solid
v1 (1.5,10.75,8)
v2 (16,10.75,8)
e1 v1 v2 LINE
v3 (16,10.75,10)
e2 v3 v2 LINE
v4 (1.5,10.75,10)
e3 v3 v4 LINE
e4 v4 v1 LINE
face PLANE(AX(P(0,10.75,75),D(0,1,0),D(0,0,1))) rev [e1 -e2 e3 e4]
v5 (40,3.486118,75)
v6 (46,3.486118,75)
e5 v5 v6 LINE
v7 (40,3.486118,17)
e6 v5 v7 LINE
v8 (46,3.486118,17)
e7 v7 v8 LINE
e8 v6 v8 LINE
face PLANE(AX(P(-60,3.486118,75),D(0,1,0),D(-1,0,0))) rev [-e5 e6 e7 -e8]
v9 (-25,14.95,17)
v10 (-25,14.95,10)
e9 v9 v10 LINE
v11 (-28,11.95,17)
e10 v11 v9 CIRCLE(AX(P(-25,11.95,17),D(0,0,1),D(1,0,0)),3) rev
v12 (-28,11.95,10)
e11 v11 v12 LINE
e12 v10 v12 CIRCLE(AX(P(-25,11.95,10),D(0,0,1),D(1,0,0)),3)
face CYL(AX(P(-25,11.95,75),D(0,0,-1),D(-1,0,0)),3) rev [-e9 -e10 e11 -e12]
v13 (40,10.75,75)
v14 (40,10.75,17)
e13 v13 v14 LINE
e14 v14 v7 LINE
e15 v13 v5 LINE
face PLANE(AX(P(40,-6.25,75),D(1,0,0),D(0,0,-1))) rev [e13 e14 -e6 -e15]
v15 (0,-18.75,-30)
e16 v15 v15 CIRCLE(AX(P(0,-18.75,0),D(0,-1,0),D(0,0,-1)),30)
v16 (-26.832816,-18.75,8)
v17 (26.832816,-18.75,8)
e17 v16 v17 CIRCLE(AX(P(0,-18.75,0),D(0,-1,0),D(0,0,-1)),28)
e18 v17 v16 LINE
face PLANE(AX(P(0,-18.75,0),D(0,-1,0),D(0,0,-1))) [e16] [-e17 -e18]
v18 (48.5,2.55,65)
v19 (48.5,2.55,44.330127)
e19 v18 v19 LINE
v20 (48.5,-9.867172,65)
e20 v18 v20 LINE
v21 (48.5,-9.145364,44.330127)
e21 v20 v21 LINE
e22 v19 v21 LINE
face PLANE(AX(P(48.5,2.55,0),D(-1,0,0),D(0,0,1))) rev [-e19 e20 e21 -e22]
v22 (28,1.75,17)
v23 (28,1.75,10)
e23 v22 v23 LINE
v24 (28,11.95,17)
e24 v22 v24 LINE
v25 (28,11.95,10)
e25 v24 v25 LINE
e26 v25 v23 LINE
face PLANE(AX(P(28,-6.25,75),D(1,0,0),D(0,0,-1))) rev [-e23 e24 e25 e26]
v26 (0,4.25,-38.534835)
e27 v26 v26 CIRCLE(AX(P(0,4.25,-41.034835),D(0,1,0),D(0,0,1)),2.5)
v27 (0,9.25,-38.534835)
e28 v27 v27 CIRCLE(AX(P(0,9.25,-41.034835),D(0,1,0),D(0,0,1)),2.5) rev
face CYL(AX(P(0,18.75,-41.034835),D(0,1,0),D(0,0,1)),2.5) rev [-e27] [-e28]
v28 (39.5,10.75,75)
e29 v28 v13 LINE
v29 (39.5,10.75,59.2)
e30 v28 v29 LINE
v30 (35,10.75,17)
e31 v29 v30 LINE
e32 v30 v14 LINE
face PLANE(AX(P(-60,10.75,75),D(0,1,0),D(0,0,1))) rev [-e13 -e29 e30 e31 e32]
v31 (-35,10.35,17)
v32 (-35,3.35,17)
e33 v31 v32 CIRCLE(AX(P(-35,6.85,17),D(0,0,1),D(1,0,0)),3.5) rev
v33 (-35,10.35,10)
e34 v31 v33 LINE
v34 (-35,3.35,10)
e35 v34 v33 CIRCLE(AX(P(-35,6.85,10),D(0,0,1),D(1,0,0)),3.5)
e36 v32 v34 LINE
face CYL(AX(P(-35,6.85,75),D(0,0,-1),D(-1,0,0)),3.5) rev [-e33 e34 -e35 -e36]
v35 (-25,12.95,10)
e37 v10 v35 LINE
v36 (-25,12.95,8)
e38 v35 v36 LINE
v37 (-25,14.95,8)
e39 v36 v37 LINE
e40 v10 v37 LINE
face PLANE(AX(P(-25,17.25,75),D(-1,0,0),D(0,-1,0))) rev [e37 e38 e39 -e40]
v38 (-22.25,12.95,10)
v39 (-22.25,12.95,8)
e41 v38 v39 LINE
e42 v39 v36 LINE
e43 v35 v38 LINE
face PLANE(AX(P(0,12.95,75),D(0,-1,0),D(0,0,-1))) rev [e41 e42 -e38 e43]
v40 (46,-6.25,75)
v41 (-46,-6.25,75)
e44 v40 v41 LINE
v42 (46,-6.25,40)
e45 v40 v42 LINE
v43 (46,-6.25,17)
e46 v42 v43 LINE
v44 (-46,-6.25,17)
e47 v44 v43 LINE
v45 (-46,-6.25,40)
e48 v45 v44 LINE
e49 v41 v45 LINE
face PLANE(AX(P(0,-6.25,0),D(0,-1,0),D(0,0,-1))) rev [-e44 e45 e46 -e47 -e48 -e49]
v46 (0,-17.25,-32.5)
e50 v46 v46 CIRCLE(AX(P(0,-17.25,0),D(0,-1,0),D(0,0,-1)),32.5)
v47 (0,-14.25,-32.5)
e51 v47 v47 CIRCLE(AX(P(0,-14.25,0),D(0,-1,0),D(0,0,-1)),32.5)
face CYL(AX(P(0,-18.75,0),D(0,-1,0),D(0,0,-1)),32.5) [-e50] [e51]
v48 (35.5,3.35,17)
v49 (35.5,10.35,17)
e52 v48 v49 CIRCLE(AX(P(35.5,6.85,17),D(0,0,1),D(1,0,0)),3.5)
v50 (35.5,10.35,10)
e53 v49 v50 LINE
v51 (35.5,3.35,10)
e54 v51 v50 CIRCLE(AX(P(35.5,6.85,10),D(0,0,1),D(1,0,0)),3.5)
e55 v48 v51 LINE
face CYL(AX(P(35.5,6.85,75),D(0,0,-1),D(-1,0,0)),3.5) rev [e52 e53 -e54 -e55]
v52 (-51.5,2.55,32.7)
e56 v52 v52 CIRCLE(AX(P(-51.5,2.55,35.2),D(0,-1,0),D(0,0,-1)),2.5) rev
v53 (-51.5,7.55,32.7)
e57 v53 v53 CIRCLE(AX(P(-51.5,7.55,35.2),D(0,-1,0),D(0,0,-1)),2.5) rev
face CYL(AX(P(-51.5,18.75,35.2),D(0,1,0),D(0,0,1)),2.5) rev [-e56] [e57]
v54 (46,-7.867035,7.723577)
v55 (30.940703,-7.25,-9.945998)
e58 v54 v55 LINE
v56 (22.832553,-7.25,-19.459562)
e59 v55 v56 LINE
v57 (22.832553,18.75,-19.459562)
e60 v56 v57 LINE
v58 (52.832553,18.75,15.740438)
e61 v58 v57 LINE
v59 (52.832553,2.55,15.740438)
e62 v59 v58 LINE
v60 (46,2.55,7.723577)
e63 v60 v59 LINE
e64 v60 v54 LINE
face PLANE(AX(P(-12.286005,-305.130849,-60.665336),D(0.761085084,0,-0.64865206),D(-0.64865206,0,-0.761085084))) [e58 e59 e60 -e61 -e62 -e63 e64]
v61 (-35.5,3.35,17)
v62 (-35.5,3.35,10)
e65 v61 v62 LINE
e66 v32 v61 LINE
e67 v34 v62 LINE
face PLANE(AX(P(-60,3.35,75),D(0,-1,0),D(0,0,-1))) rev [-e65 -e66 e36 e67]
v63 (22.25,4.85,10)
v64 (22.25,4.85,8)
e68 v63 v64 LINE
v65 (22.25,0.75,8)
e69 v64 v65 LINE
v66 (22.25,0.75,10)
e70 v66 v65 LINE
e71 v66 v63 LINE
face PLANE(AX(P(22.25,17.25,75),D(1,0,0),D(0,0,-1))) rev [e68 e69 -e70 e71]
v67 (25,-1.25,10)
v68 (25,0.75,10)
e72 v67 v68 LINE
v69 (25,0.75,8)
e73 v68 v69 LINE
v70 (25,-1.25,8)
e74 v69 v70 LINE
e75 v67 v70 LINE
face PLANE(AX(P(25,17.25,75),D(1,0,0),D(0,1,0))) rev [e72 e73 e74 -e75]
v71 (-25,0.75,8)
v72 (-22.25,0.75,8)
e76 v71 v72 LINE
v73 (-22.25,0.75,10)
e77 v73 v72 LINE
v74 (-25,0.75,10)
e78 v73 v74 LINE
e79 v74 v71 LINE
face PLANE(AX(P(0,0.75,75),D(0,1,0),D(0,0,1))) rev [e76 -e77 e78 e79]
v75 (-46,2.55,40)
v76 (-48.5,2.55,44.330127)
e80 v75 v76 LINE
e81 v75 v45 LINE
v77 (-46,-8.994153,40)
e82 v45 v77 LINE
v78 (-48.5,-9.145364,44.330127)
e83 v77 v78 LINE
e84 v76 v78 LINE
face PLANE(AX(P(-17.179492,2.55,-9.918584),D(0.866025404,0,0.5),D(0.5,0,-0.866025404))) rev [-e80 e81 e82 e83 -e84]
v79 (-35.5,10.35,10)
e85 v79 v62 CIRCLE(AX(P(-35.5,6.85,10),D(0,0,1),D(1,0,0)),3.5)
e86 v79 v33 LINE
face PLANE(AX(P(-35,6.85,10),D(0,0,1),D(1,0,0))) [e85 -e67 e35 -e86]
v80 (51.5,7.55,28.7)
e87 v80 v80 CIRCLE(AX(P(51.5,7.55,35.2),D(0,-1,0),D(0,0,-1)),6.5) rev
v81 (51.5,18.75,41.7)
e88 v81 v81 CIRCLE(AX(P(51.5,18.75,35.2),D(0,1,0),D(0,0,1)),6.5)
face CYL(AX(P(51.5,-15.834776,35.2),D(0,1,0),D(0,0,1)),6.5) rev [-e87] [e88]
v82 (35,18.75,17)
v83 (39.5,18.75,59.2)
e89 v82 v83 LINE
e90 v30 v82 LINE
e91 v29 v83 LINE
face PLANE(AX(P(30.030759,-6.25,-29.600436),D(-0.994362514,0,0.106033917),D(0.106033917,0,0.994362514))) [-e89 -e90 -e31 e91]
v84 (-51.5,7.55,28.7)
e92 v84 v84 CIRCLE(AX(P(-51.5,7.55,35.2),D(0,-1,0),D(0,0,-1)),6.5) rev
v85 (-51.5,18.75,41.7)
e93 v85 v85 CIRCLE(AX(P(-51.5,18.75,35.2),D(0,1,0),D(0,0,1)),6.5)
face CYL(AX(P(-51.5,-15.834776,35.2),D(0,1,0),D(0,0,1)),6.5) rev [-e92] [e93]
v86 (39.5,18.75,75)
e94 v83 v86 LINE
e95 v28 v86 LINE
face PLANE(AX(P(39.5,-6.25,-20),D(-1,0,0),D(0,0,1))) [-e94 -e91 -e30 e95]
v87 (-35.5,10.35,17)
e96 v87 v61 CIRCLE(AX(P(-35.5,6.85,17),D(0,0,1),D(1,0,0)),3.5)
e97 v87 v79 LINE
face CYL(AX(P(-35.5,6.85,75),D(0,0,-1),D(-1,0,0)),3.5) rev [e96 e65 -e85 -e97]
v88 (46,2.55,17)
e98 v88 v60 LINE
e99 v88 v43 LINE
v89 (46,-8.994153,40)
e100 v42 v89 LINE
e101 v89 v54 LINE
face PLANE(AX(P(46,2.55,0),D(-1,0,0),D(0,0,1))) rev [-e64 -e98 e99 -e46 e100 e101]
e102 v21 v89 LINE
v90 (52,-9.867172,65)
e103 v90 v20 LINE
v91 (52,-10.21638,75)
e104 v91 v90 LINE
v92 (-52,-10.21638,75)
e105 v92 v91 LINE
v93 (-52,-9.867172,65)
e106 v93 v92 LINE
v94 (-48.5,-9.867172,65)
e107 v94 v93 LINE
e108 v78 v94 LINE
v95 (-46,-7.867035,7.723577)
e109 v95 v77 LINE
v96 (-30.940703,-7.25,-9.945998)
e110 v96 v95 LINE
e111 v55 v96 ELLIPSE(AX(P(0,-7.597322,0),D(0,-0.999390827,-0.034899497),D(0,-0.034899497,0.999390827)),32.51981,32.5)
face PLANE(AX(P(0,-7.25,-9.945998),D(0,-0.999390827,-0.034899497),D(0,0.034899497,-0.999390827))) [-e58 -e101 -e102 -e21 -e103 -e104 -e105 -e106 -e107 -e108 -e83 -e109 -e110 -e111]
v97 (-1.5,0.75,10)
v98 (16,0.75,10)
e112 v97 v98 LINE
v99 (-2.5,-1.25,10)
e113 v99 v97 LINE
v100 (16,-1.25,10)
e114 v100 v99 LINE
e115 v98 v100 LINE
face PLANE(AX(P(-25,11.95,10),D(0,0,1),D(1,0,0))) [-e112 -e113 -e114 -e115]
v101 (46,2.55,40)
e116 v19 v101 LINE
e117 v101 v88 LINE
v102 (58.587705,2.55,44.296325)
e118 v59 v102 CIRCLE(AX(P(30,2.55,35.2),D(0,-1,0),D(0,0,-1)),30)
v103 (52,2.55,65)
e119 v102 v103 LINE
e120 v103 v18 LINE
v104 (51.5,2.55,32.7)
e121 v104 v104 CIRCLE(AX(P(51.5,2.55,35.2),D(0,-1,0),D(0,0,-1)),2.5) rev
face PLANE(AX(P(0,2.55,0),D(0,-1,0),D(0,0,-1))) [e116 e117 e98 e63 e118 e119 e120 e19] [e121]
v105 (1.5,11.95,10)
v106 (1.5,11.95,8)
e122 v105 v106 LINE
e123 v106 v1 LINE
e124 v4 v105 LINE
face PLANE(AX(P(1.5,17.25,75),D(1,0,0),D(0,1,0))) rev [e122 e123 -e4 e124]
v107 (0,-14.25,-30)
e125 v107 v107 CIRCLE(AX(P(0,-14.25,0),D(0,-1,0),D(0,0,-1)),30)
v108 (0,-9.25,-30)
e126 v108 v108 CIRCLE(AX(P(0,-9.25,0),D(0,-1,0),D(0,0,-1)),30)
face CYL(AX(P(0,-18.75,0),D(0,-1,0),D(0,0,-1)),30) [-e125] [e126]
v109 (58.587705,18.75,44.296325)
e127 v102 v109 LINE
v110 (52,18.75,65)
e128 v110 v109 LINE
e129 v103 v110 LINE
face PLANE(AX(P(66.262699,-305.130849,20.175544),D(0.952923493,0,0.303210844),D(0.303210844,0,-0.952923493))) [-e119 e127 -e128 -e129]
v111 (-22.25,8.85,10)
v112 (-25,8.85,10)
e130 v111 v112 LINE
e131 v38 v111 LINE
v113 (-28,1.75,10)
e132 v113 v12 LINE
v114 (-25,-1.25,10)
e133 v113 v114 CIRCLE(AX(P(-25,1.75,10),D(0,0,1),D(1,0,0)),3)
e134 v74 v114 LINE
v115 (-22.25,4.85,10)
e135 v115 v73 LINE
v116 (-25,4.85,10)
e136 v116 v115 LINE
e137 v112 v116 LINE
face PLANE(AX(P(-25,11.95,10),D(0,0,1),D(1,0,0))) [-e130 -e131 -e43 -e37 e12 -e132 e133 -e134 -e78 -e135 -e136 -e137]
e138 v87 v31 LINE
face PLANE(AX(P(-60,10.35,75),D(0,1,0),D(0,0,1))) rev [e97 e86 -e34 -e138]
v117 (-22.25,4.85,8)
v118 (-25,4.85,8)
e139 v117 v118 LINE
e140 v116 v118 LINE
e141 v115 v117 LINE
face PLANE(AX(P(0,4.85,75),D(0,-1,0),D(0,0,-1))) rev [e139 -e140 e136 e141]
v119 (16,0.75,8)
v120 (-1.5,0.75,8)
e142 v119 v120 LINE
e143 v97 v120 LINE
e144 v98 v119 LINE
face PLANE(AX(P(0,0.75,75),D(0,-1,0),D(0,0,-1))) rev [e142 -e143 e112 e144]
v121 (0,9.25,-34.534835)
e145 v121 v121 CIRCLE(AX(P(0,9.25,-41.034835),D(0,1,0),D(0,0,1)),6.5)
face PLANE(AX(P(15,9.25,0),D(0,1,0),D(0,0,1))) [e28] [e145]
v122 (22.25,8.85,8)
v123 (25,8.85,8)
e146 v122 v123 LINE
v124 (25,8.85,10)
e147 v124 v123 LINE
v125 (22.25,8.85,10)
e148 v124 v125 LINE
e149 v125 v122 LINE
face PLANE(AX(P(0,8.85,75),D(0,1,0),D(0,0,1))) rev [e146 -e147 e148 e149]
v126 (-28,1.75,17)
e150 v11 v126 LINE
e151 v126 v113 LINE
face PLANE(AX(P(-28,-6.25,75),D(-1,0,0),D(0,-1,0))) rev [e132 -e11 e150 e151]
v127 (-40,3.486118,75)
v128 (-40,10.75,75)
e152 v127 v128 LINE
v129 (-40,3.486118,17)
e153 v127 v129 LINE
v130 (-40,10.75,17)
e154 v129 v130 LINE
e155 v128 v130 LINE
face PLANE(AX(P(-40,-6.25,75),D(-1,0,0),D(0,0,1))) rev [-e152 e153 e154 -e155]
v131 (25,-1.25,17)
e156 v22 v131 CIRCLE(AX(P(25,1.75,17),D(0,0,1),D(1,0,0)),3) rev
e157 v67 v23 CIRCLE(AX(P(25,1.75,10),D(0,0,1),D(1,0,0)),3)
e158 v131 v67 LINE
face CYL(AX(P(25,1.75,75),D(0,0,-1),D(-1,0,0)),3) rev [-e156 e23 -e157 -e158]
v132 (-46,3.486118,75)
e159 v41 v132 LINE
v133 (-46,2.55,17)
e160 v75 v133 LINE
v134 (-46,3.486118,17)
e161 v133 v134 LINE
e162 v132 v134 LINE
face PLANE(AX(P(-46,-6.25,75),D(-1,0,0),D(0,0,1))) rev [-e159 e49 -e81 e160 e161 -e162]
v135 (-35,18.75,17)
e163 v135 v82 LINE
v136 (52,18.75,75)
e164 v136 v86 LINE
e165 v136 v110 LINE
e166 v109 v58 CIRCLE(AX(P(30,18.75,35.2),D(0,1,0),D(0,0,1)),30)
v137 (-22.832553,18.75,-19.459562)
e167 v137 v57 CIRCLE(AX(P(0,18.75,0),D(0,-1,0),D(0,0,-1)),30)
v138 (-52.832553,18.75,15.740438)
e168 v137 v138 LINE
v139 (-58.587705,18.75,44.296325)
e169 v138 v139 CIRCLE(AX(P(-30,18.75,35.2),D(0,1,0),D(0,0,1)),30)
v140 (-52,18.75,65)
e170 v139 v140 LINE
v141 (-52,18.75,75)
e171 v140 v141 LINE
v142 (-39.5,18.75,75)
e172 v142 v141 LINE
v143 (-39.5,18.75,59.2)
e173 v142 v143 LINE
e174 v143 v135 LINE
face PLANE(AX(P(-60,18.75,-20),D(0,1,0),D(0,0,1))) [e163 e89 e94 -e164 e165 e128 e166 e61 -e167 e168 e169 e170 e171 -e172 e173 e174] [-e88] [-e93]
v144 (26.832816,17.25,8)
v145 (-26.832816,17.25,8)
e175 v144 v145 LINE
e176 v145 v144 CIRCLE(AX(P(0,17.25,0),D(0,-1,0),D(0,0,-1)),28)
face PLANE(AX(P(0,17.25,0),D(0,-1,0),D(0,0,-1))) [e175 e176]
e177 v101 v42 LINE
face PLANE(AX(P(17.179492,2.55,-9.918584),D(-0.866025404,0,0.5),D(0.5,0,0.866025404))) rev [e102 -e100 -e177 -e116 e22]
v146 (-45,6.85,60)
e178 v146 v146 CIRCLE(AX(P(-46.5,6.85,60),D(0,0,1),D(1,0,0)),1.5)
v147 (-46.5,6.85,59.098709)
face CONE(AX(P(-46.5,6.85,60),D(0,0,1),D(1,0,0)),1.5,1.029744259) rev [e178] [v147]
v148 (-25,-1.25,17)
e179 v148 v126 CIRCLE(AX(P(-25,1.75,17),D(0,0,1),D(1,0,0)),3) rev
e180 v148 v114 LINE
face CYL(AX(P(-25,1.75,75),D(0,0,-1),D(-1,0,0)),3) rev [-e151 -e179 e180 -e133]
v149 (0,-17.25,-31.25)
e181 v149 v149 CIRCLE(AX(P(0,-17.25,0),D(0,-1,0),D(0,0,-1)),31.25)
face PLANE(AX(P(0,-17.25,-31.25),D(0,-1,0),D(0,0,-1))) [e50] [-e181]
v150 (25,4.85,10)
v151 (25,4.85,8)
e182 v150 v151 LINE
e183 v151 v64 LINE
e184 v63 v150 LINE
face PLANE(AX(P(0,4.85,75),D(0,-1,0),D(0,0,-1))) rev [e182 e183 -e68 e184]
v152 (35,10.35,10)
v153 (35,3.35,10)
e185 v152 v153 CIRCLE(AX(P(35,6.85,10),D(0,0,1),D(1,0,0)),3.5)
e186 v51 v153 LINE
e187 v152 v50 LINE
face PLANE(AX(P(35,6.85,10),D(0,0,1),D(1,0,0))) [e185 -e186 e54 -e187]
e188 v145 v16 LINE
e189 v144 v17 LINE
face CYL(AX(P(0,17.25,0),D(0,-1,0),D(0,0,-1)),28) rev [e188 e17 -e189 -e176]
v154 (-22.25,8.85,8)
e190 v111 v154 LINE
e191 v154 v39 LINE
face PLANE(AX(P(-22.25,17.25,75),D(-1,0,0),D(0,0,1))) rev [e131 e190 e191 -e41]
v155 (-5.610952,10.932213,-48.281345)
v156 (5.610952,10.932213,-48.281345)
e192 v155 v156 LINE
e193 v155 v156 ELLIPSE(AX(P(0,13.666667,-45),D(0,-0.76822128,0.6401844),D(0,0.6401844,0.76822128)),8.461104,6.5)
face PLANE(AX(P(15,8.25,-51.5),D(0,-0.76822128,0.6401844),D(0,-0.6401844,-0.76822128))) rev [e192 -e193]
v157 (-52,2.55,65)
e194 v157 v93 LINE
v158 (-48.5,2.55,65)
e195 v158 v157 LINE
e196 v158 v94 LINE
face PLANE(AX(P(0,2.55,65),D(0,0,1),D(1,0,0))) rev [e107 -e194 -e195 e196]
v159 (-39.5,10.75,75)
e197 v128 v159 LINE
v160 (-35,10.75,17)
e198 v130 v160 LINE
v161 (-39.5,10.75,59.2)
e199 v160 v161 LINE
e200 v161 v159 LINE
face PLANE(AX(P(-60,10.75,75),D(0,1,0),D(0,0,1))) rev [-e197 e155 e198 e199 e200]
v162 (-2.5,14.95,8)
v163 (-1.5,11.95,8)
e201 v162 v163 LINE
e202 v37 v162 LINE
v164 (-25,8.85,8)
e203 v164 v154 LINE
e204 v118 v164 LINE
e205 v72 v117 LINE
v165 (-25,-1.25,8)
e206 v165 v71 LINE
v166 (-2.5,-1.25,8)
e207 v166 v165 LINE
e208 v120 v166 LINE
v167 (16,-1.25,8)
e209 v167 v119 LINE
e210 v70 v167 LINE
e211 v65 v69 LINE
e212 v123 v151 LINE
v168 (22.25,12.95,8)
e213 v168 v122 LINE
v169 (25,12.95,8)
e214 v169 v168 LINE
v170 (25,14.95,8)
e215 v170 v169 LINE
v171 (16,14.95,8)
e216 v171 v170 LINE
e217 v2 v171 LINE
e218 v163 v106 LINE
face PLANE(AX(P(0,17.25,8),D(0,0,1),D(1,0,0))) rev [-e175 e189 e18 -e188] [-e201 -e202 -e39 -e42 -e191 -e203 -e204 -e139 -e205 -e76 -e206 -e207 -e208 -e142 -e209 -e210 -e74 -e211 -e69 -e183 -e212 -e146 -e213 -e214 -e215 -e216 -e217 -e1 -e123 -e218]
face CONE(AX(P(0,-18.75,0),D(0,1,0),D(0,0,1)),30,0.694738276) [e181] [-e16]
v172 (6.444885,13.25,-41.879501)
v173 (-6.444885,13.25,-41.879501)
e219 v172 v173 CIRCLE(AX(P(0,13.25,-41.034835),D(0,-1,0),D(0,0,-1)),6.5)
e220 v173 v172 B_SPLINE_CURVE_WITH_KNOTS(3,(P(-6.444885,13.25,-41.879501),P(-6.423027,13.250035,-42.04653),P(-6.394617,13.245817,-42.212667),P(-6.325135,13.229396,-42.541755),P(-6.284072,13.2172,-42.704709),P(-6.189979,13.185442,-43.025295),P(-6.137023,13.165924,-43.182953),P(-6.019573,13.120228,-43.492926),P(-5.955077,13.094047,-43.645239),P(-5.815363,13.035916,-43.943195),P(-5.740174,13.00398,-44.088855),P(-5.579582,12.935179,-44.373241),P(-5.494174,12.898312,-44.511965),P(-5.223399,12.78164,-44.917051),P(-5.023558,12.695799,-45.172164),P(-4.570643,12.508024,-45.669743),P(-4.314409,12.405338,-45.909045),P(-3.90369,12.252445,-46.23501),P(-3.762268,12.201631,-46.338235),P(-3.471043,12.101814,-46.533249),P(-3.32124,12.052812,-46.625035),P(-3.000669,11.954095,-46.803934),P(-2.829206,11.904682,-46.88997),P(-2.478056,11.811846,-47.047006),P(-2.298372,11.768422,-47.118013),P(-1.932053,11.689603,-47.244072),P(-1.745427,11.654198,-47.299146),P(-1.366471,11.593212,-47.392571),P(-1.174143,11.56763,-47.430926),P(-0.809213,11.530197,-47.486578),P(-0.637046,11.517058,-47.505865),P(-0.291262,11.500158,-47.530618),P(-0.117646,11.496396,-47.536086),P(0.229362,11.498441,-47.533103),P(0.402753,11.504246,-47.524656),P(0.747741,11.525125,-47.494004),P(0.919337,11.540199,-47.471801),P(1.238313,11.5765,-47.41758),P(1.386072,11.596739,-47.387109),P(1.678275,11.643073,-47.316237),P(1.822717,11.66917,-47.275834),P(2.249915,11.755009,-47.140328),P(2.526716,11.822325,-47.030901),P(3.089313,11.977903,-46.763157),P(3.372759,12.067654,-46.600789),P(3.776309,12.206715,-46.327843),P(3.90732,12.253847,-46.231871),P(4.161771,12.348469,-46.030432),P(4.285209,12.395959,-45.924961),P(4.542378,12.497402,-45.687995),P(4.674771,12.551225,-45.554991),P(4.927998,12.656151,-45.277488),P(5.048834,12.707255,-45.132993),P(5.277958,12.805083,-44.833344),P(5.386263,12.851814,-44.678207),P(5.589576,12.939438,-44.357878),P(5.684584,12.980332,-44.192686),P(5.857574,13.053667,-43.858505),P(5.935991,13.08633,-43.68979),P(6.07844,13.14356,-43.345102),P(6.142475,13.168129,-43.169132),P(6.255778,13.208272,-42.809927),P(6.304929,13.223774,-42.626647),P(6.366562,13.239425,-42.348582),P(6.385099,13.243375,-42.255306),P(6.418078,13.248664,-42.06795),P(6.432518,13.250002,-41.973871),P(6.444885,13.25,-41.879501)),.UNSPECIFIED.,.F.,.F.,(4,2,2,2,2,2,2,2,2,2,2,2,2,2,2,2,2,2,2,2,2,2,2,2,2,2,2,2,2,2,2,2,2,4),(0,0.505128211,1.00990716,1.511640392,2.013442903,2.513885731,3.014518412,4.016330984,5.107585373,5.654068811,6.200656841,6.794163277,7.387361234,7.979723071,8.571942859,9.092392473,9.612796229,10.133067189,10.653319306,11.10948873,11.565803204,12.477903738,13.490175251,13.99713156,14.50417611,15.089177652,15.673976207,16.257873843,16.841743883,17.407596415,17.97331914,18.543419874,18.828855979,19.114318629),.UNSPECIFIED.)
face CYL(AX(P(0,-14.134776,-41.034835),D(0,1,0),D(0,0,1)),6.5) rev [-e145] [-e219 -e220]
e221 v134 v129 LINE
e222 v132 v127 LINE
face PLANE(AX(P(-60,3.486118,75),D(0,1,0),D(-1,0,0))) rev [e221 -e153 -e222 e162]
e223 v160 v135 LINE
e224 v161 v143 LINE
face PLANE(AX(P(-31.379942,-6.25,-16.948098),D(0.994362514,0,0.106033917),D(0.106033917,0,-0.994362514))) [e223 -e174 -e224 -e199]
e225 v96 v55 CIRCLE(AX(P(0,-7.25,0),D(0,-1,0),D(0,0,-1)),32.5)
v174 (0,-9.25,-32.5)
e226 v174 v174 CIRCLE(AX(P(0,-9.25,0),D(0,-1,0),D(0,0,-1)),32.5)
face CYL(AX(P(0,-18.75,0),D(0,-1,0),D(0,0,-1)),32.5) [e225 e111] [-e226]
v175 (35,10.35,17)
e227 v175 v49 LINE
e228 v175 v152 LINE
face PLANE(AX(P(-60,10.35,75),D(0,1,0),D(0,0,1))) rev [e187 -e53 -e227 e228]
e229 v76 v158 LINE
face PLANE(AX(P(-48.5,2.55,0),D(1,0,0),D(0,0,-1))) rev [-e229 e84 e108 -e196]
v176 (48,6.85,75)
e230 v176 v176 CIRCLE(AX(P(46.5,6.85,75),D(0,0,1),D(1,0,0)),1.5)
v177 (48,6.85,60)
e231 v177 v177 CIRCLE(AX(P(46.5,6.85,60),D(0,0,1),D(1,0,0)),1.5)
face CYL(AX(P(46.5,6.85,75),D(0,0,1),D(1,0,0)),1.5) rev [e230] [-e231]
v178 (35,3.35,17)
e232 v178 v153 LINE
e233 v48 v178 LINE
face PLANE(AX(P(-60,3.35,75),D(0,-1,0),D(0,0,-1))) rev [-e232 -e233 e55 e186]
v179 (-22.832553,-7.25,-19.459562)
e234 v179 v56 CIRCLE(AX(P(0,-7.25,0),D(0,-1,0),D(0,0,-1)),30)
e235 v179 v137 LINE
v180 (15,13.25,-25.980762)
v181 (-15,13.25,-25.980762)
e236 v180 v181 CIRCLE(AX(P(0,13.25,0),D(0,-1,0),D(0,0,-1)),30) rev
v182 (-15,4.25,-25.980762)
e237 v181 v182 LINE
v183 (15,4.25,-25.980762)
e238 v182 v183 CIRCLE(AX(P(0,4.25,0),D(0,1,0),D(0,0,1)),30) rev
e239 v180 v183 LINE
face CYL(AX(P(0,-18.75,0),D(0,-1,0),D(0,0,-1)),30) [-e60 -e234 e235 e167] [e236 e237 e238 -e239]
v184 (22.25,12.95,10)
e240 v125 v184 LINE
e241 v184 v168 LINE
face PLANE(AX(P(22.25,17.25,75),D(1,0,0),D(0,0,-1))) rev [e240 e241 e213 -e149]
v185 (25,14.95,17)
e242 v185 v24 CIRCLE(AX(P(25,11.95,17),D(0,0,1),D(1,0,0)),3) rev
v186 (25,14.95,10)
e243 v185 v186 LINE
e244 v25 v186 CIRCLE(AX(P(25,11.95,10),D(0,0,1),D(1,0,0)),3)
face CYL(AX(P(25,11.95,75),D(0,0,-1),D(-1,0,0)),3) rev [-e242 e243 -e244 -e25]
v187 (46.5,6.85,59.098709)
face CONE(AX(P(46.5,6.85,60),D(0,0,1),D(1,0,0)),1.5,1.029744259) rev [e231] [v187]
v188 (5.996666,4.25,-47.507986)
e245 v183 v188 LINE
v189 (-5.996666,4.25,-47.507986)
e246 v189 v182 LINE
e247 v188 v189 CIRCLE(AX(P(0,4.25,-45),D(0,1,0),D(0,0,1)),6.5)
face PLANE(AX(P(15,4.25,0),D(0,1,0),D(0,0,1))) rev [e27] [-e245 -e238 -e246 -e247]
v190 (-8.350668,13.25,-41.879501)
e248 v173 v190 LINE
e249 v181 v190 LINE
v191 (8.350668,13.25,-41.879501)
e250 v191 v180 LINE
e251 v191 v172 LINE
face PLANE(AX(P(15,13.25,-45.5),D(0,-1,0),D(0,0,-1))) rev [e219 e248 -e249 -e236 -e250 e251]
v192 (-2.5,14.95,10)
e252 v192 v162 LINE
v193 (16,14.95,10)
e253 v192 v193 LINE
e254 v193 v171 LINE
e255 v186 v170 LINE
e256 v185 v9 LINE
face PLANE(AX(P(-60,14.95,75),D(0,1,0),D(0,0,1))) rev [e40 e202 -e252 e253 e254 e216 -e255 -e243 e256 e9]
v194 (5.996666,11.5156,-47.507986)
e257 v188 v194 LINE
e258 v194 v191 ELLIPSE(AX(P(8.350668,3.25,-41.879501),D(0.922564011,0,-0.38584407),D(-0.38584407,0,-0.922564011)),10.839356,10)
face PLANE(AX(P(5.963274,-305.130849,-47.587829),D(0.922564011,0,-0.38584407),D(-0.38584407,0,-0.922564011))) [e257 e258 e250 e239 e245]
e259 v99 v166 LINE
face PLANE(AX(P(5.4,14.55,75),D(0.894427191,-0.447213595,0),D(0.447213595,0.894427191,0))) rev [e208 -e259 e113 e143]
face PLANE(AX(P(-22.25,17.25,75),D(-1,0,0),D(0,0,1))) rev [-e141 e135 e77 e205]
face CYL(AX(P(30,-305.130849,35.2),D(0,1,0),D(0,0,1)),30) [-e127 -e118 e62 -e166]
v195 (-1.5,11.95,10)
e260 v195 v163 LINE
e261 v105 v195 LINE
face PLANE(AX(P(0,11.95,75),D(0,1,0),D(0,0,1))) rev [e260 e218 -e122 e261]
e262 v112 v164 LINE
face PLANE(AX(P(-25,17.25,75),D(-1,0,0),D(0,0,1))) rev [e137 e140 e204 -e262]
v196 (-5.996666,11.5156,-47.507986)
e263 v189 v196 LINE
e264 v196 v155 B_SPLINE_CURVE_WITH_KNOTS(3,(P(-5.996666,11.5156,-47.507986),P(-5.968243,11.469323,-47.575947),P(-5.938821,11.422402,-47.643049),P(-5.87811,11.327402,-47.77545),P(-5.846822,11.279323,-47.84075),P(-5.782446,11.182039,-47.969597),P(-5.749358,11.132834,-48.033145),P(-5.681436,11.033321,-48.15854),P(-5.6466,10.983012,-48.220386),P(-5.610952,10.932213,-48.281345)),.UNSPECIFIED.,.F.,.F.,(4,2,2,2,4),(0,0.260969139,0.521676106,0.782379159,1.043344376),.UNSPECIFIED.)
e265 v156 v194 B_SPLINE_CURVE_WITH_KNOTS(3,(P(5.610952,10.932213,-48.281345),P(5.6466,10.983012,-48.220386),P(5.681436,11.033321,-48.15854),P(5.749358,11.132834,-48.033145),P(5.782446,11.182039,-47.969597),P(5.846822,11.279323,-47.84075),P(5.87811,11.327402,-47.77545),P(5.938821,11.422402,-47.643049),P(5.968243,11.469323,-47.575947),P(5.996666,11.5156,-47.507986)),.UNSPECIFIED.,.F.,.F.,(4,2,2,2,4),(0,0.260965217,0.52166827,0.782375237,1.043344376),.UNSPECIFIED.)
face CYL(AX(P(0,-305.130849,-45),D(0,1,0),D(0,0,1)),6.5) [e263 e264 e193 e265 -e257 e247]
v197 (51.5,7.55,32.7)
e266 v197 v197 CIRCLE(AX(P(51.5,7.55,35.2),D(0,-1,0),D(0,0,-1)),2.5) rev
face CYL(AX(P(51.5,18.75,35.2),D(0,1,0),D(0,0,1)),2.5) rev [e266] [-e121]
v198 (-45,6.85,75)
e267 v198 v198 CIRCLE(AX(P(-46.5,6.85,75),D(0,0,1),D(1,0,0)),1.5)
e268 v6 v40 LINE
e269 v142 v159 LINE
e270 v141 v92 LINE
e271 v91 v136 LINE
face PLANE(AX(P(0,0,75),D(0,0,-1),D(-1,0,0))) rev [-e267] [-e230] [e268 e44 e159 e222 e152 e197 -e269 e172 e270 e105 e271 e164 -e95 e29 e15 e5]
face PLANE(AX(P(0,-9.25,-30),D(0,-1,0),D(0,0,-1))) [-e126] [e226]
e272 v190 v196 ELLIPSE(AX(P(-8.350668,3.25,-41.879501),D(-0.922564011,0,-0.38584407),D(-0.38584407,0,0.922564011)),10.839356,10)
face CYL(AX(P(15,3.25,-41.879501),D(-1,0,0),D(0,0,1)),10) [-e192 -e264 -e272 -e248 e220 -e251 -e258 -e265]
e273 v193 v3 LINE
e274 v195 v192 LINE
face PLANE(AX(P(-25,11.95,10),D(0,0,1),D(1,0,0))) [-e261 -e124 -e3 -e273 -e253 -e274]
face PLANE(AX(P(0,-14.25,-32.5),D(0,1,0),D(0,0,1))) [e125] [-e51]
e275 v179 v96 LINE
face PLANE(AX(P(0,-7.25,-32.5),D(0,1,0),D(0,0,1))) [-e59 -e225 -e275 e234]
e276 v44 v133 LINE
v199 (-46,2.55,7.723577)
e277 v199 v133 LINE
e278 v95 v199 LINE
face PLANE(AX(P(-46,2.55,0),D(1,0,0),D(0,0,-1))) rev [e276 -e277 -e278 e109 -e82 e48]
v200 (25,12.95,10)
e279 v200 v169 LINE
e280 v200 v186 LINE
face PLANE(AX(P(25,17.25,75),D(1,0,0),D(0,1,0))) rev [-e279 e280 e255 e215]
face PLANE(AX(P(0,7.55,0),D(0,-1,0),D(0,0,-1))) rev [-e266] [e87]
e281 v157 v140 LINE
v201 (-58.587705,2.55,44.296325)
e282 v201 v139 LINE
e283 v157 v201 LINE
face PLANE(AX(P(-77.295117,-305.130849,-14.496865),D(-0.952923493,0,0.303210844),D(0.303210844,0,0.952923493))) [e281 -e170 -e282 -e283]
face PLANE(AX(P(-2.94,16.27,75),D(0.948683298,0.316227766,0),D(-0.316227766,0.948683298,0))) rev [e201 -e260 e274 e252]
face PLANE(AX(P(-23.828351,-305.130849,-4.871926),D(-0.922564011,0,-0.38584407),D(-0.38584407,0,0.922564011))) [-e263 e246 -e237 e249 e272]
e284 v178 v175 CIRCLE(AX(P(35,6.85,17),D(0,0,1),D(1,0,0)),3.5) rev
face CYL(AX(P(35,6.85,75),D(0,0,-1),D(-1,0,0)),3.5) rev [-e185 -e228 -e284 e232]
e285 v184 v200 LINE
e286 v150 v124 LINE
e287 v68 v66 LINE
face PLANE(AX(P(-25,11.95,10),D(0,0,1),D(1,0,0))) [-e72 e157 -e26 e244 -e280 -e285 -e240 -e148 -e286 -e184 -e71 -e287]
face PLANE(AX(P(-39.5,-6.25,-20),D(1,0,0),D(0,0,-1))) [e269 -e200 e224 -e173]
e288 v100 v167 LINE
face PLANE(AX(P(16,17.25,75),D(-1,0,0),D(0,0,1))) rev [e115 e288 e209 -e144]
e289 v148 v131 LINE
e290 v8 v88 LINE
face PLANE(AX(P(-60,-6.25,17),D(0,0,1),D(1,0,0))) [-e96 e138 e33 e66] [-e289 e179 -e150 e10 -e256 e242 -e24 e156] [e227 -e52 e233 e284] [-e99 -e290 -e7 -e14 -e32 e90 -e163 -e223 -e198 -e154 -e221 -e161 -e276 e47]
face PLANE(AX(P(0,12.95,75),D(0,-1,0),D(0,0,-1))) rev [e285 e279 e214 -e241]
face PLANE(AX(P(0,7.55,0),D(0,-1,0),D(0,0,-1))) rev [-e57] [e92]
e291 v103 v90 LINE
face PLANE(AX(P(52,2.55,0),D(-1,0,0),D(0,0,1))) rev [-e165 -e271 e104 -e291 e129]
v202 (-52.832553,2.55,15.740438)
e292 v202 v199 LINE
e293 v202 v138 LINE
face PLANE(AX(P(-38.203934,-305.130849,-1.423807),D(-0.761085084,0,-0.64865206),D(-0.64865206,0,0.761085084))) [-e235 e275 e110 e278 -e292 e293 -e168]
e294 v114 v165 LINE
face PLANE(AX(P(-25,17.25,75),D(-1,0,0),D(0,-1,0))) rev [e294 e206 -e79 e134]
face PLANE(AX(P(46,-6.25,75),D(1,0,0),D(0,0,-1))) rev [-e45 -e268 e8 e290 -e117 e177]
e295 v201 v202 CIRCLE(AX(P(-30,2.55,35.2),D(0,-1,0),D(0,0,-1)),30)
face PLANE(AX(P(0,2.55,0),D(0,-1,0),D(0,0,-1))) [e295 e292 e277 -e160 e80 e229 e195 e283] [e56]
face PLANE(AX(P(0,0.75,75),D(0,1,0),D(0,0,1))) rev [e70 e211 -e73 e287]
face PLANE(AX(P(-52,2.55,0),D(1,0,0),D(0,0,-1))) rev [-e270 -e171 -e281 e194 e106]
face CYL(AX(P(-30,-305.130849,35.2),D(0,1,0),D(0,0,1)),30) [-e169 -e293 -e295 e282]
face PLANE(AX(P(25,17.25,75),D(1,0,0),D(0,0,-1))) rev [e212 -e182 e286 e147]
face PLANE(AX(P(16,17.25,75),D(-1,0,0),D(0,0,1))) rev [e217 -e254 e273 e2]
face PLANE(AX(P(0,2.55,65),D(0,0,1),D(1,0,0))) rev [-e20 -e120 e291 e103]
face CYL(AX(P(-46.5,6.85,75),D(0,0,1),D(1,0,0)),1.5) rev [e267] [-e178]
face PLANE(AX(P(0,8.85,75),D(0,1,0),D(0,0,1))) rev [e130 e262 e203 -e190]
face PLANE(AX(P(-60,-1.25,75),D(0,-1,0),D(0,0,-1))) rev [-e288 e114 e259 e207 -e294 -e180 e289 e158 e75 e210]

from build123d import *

# Parameters (mm, degrees)
TOP_SIDE_R                   = 0.5
BASE_MODEL_DEPTH             = 0.5
BOSS_EXTRUDE1_DEPTH          = 15
BOSS_EXTRUDE2_DEPTH          = 75
BOSS_EXTRUDE2_DEPTH_BACK     = 20
SKETCH9_W                    = 120
SKETCH9_H                    = 26
F_5_0_5_DIAMETER_HOLE1_D     = 5
CUT_EXTRUDE1_START           = 2.55
CUT_EXTRUDE1_DEPTH           = 21.3
CUT_EXTRUDE2_DEPTH           = 98.85991263
CUT_EXTRUDE2_DEPTH_BACK      = 9.8
CUT_EXTRUDE2_START           = 2.55
DRAFT11_START                = -48.5
DRAFT11_DEPTH                = 97
DRAFT11_START_2              = -52
DRAFT11_2_DEPTH              = 104
DRAFT11_START_3              = -9.867171929
DRAFT11_3_DEPTH              = 2.617171929
CUT_EXTRUDE5_START           = -18.75
CUT_EXTRUDE5_DEPTH           = 36
FILLET2_R                    = 10
CUT_EXTRUDE3_START           = 13.25
SKETCH12_R                   = 6.5
CUT_EXTRUDE3_DEPTH           = 4
CUT_EXTRUDE4_START           = 7.55
SKETCH14_R                   = 6.5
CUT_EXTRUDE4_DEPTH           = 11.2
CUT_EXTRUDE6_START           = -6.25
CUT_EXTRUDE6_DEPTH           = 25
CUT_EXTRUDE7_DEPTH           = 98.85991263
CUT_EXTRUDE7_DEPTH_BACK      = 7
CUT_EXTRUDE7_START           = 17
CUT_EXTRUDE8_START           = 17
CUT_EXTRUDE8_DEPTH           = 81.85991263
CUT_EXTRUDE9_START           = 8
CUT_EXTRUDE9_DEPTH           = 90.85991263
F_3_0_3_DIAMETER_HOLE1_D     = 3
F_3_0_3_DIAMETER_HOLE1_DEPTH = 15
F_3_0_3_DIAMETER_HOLE1_TIP   = 0.901290929


with BuildPart() as part:
    # Top Side → Base Model (new, symmetric)
    with BuildSketch(Plane(origin=(0, 0, 0), x_dir=(1, 0, 0), z_dir=(0, 1, 0))):
        with Locations(Location((0, 0, 0), (0, 0, 270))):
            Circle(TOP_SIDE_R)
    extrude(amount=BASE_MODEL_DEPTH, both=True)



with BuildPart() as body_2:
    # Sketch3 → Base (revolve)
    with BuildSketch(Plane(origin=(0, 0, 0), x_dir=(0, 0, -1), z_dir=(1, 0, 0))):
        Polygon((0, -18.75), (30, -18.75), (31.25, -17.25), (32.5, -17.25), (32.5, -14.25), (30, -14.25), (30, -9.25), (32.5, -9.25), (32.5, -7.25), (30, -7.25), (30, 18.75), (0, 18.75), align=None)
    revolve(axis=Axis((0, -18.75, 0), (0, 1, 0)))

    # Sketch8 → Boss-Extrude1 (add, symmetric)
    with BuildSketch(Plane(origin=(0, 0, 0), x_dir=(0, 0, -1), z_dir=(1, 0, 0))):
        Polygon((0, 4.25), (51.5, 4.25), (51.5, 8.25), (45.5, 13.25), (0, 13.25), align=None)
    extrude(amount=BOSS_EXTRUDE1_DEPTH, both=True)


with BuildPart() as part_1:
    add(part.part)

    add(body_2.part)  # Boss-Extrude2 merges body 2
    # Sketch9 → Boss-Extrude2 (add, two sides: drawn at the far end of the back side and taken through both)
    with BuildSketch(Plane.XY.offset(-BOSS_EXTRUDE2_DEPTH_BACK)):
        with Locations((0, 5.75)):
            Rectangle(SKETCH9_W, SKETCH9_H)
    extrude(amount=BOSS_EXTRUDE2_DEPTH + BOSS_EXTRUDE2_DEPTH_BACK)

    # Ø5.0 (5) Diameter Hole1 (through all)
    with Locations(Plane(origin=(0, 18.75, 0), x_dir=(1, 0, 0), z_dir=(0, 1, 0))):
        with Locations((-51.5, -35.2), (0, 41.034834557), (51.5, -35.2)):
            Hole(F_5_0_5_DIAMETER_HOLE1_D / 2)

    # Bottom Side Sketch5 → Cut-Extrude1 (cut)
    with BuildSketch(Plane(origin=(0, 0, 0), x_dir=(1, 0, 0), z_dir=(0, 1, 0)).offset(CUT_EXTRUDE1_START)):
        with BuildLine():
            Line((-25.617376915, 20), (-46, -6.107466904))
            Line((-46, -6.107466904), (-46, -40))
            Line((-46, -40), (-48.5, -44.330127019))
            Line((-48.5, -44.330127019), (-48.5, -65))
            Line((-48.5, -65), (-52, -65))
            Line((-52, -65), (-52, -116.5))
            Line((-52, -116.5), (-101.5, -116.5))
            Line((-101.5, -116.5), (-101.5, 101.5))
            Line((-101.5, 101.5), (101.5, 101.5))
            Line((101.5, 101.5), (101.5, -116.5))
            Line((101.5, -116.5), (52, -116.5))
            Line((52, -116.5), (52, -65))
            Line((52, -65), (48.5, -65))
            Line((48.5, -65), (48.5, -44.330127019))
            Line((48.5, -44.330127019), (46, -40))
            Line((46, -40), (46, -6.107466904))
            Line((46, -6.107466904), (25.617376915, 20))
            ThreePointArc((25.617376915, 20), (0, 32.5), (-25.617376915, 20))
        make_face()
    extrude(amount=-CUT_EXTRUDE1_DEPTH, mode=Mode.SUBTRACT)

    # Sketch11 → Cut-Extrude2 (cut, two sides: drawn at the far end of the back side and taken through both)
    with BuildSketch(Plane(origin=(0, 0, 0), x_dir=(1, 0, 0), z_dir=(0, 1, 0)).offset(CUT_EXTRUDE2_START - CUT_EXTRUDE2_DEPTH_BACK)):
        with BuildLine():
            Line((-52, -116.5), (-52, -65))
            Line((-52, -65), (-58.587704801, -44.296325315))
            ThreePointArc((-58.587704801, -44.296325315), (-59.408678786, -29.272976119), (-52.832552516, -15.740438196))
            Line((-52.832552516, -15.740438196), (-22.832552516, 19.459561804))
            ThreePointArc((-22.832552516, 19.459561804), (-19.195234326, 23.055215877), (-15, 25.980762114))
            Line((-15, 25.980762114), (-5.996666068, 47.507986456))
            ThreePointArc((-5.996666068, 47.507986456), (0, 51.5), (5.996666068, 47.507986456))
            Line((5.996666068, 47.507986456), (15, 25.980762114))
            ThreePointArc((15, 25.980762114), (19.195234326, 23.055215877), (22.832552516, 19.459561804))
            Line((22.832552516, 19.459561804), (52.832552516, -15.740438196))
            ThreePointArc((52.832552516, -15.740438196), (59.408678786, -29.272976119), (58.587704801, -44.296325315))
            Line((58.587704801, -44.296325315), (52, -65))
            Line((52, -65), (52, -116.5))
            Line((52, -116.5), (101.5, -116.5))
            Line((101.5, -116.5), (101.5, 101.5))
            Line((101.5, 101.5), (-101.5, 101.5))
            Line((-101.5, 101.5), (-101.5, -116.5))
            Line((-101.5, -116.5), (-52, -116.5))
        make_face()
    extrude(amount=CUT_EXTRUDE2_DEPTH + CUT_EXTRUDE2_DEPTH_BACK, mode=Mode.SUBTRACT)

    # Draft11: read off the stored shape, not the designer's step
    # Draft11 outline → Draft11 (add)
    with BuildSketch(Plane.YZ.offset(DRAFT11_START)):
        Polygon((-7.25, 75), (-10.216379624, 75), (-7.25, -9.945998255), align=None)
    extrude(amount=DRAFT11_DEPTH)

    # Draft11 2 outline → Draft11 2 (add)
    with BuildSketch(Plane.YZ.offset(DRAFT11_START_2)):
        Polygon((-7.25, 75), (-10.216379624, 75), (-9.867171929, 65), (-7.25, 65), align=None)
    extrude(amount=DRAFT11_2_DEPTH)

    # Draft11 3 outline → Draft11 3 (cut)
    with BuildSketch(Plane(origin=(0, 0, 0), x_dir=(1, 0, 0), z_dir=(0, 1, 0)).offset(DRAFT11_START_3)):
        Polygon((48.5, 9.945998255), (30.940703268, 9.945998255), (46, -7.723576577), (46, -40), (48.5, -44.330127019), align=None)
        Polygon((-30.940703268, 9.945998255), (-48.5, 9.945998255), (-48.5, -44.330127019), (-46, -40), (-46, -7.723576577), align=None)
    extrude(amount=DRAFT11_3_DEPTH, mode=Mode.SUBTRACT)

    # Sketch16 → Cut-Extrude5 (cut)
    with BuildSketch(Plane(origin=(0, 0, 0), x_dir=(1, 0, 0), z_dir=(0, 1, 0)).offset(CUT_EXTRUDE5_START)):
        with BuildLine():
            Line((-26.83281573, -8), (26.83281573, -8))
            ThreePointArc((26.83281573, -8), (0, 28), (-26.83281573, -8))
        make_face()
    extrude(amount=CUT_EXTRUDE5_DEPTH, mode=Mode.SUBTRACT)

    # Fillet2
    # the kernel refuses this fillet: 10 mm, written as the material it takes off along each edge
    with BuildSketch(Plane(origin=(15.887714893, 13.25, -45.5), x_dir=(0, 0, 1), z_dir=(-1, 0, 0))) as fillet2_piece_1:
        with BuildLine():
            CenterArc((FILLET2_R * 0.362049935181, -FILLET2_R), FILLET2_R, 90, 39.805571092)
            Line((-FILLET2_R * 0.278134464483, -FILLET2_R * 0.231778720403), (0, 0))
            Line((0, 0), (FILLET2_R * 0.362049935181, 0))
        make_face()
    extrude(amount=31.775429787, mode=Mode.SUBTRACT)

    # Sketch12 → Cut-Extrude3 (cut)
    with BuildSketch(Plane(origin=(0, 0, 0), x_dir=(1, 0, 0), z_dir=(0, 1, 0)).offset(CUT_EXTRUDE3_START)):
        with Locations(Location((0, 41.034834557, 0), (0, 0, 270))):
            Circle(SKETCH12_R)
    extrude(amount=-CUT_EXTRUDE3_DEPTH, mode=Mode.SUBTRACT)

    # Sketch14 → Cut-Extrude4 (cut)
    with BuildSketch(Plane(origin=(0, 0, 0), x_dir=(1, 0, 0), z_dir=(0, 1, 0)).offset(CUT_EXTRUDE4_START)):
        with Locations(Location((51.5, -35.2, 0), (0, 0, 270))):
            Circle(SKETCH14_R)
        with Locations(Location((-51.5, -35.2, 0), (0, 0, 270))):
            Circle(SKETCH14_R)
    extrude(amount=CUT_EXTRUDE4_DEPTH, mode=Mode.SUBTRACT)

    # Sketch19 → Cut-Extrude6 (cut)
    with BuildSketch(Plane(origin=(0, 0, 0), x_dir=(1, 0, 0), z_dir=(0, 1, 0)).offset(CUT_EXTRUDE6_START)):
        Polygon((35, -17), (-35, -17), (-39.5, -59.2), (-39.5, -116.5), (39.5, -116.5), (39.5, -59.2), align=None)
    extrude(amount=CUT_EXTRUDE6_DEPTH, mode=Mode.SUBTRACT)

    # Sketch20 → Cut-Extrude7 (cut, two sides: drawn at the far end of the back side and taken through both)
    with BuildSketch(Plane.XY.offset(CUT_EXTRUDE7_START - CUT_EXTRUDE7_DEPTH_BACK)):
        with BuildLine():
            Line((-25, 14.95), (25, 14.95))
            ThreePointArc((25, 14.95), (27.121320344, 14.071320344), (28, 11.95))
            Line((28, 11.95), (28, 1.75))
            ThreePointArc((28, 1.75), (27.121320344, -0.371320344), (25, -1.25))
            Line((25, -1.25), (-25, -1.25))
            ThreePointArc((-25, -1.25), (-27.121320344, -0.371320344), (-28, 1.75))
            Line((-28, 1.75), (-28, 11.95))
            ThreePointArc((-28, 11.95), (-27.121320344, 14.071320344), (-25, 14.95))
        make_face()
        with BuildLine():
            Line((-35.5, 10.35), (-35, 10.35))
            ThreePointArc((-35, 10.35), (-31.5, 6.85), (-35, 3.35))
            Line((-35, 3.35), (-35.5, 3.35))
            ThreePointArc((-35.5, 3.35), (-39, 6.85), (-35.5, 10.35))
        make_face()
        with BuildLine():
            Line((35.5, 10.35), (35, 10.35))
            ThreePointArc((35, 10.35), (31.5, 6.85), (35, 3.35))
            Line((35, 3.35), (35.5, 3.35))
            ThreePointArc((35.5, 3.35), (39, 6.85), (35.5, 10.35))
        make_face()
    extrude(amount=CUT_EXTRUDE7_DEPTH + CUT_EXTRUDE7_DEPTH_BACK, mode=Mode.SUBTRACT)

    # Sketch21 → Cut-Extrude8 (cut, through all)
    with BuildSketch(Plane.XY.offset(CUT_EXTRUDE8_START)):
        Polygon((35, 18.75), (35, 10.75), (40, 10.75), (40, 3.486117838), (46, 3.486117838), (46, -6.25), (-46, -6.25), (-46, 3.486117838), (-40, 3.486117838), (-40, 10.75), (-35, 10.75), (-35, 18.75), align=None)
    extrude(amount=CUT_EXTRUDE8_DEPTH, mode=Mode.SUBTRACT)

    # Sketch23 → Cut-Extrude9 (cut, through all)
    with BuildSketch(Plane.XY.offset(CUT_EXTRUDE9_START)):
        Polygon((-2.5, 14.95), (-25, 14.95), (-25, 12.95), (-22.25, 12.95), (-22.25, 8.85), (-25, 8.85), (-25, 4.85), (-22.25, 4.85), (-22.25, 0.75), (-25, 0.75), (-25, -1.25), (-2.5, -1.25), (-1.5, 0.75), (16, 0.75), (16, -1.25), (25, -1.25), (25, 0.75), (22.25, 0.75), (22.25, 4.85), (25, 4.85), (25, 8.85), (22.25, 8.85), (22.25, 12.95), (25, 12.95), (25, 14.95), (16, 14.95), (16, 10.75), (1.5, 10.75), (1.5, 11.95), (-1.5, 11.95), align=None)
    extrude(amount=CUT_EXTRUDE9_DEPTH, mode=Mode.SUBTRACT)

    # Ø3.0 (3) Diameter Hole1
    with Locations(Plane.XY.offset(75)):
        with Locations((-46.5, 6.85), (46.5, 6.85)):
            Hole(F_3_0_3_DIAMETER_HOLE1_D / 2, depth=F_3_0_3_DIAMETER_HOLE1_DEPTH)
            with Locations((0, 0, -(F_3_0_3_DIAMETER_HOLE1_DEPTH + F_3_0_3_DIAMETER_HOLE1_TIP / 2))):  # 118° drill point
                Cone(0, F_3_0_3_DIAMETER_HOLE1_D / 2, F_3_0_3_DIAMETER_HOLE1_TIP, mode=Mode.SUBTRACT)


solid = part_1.part
